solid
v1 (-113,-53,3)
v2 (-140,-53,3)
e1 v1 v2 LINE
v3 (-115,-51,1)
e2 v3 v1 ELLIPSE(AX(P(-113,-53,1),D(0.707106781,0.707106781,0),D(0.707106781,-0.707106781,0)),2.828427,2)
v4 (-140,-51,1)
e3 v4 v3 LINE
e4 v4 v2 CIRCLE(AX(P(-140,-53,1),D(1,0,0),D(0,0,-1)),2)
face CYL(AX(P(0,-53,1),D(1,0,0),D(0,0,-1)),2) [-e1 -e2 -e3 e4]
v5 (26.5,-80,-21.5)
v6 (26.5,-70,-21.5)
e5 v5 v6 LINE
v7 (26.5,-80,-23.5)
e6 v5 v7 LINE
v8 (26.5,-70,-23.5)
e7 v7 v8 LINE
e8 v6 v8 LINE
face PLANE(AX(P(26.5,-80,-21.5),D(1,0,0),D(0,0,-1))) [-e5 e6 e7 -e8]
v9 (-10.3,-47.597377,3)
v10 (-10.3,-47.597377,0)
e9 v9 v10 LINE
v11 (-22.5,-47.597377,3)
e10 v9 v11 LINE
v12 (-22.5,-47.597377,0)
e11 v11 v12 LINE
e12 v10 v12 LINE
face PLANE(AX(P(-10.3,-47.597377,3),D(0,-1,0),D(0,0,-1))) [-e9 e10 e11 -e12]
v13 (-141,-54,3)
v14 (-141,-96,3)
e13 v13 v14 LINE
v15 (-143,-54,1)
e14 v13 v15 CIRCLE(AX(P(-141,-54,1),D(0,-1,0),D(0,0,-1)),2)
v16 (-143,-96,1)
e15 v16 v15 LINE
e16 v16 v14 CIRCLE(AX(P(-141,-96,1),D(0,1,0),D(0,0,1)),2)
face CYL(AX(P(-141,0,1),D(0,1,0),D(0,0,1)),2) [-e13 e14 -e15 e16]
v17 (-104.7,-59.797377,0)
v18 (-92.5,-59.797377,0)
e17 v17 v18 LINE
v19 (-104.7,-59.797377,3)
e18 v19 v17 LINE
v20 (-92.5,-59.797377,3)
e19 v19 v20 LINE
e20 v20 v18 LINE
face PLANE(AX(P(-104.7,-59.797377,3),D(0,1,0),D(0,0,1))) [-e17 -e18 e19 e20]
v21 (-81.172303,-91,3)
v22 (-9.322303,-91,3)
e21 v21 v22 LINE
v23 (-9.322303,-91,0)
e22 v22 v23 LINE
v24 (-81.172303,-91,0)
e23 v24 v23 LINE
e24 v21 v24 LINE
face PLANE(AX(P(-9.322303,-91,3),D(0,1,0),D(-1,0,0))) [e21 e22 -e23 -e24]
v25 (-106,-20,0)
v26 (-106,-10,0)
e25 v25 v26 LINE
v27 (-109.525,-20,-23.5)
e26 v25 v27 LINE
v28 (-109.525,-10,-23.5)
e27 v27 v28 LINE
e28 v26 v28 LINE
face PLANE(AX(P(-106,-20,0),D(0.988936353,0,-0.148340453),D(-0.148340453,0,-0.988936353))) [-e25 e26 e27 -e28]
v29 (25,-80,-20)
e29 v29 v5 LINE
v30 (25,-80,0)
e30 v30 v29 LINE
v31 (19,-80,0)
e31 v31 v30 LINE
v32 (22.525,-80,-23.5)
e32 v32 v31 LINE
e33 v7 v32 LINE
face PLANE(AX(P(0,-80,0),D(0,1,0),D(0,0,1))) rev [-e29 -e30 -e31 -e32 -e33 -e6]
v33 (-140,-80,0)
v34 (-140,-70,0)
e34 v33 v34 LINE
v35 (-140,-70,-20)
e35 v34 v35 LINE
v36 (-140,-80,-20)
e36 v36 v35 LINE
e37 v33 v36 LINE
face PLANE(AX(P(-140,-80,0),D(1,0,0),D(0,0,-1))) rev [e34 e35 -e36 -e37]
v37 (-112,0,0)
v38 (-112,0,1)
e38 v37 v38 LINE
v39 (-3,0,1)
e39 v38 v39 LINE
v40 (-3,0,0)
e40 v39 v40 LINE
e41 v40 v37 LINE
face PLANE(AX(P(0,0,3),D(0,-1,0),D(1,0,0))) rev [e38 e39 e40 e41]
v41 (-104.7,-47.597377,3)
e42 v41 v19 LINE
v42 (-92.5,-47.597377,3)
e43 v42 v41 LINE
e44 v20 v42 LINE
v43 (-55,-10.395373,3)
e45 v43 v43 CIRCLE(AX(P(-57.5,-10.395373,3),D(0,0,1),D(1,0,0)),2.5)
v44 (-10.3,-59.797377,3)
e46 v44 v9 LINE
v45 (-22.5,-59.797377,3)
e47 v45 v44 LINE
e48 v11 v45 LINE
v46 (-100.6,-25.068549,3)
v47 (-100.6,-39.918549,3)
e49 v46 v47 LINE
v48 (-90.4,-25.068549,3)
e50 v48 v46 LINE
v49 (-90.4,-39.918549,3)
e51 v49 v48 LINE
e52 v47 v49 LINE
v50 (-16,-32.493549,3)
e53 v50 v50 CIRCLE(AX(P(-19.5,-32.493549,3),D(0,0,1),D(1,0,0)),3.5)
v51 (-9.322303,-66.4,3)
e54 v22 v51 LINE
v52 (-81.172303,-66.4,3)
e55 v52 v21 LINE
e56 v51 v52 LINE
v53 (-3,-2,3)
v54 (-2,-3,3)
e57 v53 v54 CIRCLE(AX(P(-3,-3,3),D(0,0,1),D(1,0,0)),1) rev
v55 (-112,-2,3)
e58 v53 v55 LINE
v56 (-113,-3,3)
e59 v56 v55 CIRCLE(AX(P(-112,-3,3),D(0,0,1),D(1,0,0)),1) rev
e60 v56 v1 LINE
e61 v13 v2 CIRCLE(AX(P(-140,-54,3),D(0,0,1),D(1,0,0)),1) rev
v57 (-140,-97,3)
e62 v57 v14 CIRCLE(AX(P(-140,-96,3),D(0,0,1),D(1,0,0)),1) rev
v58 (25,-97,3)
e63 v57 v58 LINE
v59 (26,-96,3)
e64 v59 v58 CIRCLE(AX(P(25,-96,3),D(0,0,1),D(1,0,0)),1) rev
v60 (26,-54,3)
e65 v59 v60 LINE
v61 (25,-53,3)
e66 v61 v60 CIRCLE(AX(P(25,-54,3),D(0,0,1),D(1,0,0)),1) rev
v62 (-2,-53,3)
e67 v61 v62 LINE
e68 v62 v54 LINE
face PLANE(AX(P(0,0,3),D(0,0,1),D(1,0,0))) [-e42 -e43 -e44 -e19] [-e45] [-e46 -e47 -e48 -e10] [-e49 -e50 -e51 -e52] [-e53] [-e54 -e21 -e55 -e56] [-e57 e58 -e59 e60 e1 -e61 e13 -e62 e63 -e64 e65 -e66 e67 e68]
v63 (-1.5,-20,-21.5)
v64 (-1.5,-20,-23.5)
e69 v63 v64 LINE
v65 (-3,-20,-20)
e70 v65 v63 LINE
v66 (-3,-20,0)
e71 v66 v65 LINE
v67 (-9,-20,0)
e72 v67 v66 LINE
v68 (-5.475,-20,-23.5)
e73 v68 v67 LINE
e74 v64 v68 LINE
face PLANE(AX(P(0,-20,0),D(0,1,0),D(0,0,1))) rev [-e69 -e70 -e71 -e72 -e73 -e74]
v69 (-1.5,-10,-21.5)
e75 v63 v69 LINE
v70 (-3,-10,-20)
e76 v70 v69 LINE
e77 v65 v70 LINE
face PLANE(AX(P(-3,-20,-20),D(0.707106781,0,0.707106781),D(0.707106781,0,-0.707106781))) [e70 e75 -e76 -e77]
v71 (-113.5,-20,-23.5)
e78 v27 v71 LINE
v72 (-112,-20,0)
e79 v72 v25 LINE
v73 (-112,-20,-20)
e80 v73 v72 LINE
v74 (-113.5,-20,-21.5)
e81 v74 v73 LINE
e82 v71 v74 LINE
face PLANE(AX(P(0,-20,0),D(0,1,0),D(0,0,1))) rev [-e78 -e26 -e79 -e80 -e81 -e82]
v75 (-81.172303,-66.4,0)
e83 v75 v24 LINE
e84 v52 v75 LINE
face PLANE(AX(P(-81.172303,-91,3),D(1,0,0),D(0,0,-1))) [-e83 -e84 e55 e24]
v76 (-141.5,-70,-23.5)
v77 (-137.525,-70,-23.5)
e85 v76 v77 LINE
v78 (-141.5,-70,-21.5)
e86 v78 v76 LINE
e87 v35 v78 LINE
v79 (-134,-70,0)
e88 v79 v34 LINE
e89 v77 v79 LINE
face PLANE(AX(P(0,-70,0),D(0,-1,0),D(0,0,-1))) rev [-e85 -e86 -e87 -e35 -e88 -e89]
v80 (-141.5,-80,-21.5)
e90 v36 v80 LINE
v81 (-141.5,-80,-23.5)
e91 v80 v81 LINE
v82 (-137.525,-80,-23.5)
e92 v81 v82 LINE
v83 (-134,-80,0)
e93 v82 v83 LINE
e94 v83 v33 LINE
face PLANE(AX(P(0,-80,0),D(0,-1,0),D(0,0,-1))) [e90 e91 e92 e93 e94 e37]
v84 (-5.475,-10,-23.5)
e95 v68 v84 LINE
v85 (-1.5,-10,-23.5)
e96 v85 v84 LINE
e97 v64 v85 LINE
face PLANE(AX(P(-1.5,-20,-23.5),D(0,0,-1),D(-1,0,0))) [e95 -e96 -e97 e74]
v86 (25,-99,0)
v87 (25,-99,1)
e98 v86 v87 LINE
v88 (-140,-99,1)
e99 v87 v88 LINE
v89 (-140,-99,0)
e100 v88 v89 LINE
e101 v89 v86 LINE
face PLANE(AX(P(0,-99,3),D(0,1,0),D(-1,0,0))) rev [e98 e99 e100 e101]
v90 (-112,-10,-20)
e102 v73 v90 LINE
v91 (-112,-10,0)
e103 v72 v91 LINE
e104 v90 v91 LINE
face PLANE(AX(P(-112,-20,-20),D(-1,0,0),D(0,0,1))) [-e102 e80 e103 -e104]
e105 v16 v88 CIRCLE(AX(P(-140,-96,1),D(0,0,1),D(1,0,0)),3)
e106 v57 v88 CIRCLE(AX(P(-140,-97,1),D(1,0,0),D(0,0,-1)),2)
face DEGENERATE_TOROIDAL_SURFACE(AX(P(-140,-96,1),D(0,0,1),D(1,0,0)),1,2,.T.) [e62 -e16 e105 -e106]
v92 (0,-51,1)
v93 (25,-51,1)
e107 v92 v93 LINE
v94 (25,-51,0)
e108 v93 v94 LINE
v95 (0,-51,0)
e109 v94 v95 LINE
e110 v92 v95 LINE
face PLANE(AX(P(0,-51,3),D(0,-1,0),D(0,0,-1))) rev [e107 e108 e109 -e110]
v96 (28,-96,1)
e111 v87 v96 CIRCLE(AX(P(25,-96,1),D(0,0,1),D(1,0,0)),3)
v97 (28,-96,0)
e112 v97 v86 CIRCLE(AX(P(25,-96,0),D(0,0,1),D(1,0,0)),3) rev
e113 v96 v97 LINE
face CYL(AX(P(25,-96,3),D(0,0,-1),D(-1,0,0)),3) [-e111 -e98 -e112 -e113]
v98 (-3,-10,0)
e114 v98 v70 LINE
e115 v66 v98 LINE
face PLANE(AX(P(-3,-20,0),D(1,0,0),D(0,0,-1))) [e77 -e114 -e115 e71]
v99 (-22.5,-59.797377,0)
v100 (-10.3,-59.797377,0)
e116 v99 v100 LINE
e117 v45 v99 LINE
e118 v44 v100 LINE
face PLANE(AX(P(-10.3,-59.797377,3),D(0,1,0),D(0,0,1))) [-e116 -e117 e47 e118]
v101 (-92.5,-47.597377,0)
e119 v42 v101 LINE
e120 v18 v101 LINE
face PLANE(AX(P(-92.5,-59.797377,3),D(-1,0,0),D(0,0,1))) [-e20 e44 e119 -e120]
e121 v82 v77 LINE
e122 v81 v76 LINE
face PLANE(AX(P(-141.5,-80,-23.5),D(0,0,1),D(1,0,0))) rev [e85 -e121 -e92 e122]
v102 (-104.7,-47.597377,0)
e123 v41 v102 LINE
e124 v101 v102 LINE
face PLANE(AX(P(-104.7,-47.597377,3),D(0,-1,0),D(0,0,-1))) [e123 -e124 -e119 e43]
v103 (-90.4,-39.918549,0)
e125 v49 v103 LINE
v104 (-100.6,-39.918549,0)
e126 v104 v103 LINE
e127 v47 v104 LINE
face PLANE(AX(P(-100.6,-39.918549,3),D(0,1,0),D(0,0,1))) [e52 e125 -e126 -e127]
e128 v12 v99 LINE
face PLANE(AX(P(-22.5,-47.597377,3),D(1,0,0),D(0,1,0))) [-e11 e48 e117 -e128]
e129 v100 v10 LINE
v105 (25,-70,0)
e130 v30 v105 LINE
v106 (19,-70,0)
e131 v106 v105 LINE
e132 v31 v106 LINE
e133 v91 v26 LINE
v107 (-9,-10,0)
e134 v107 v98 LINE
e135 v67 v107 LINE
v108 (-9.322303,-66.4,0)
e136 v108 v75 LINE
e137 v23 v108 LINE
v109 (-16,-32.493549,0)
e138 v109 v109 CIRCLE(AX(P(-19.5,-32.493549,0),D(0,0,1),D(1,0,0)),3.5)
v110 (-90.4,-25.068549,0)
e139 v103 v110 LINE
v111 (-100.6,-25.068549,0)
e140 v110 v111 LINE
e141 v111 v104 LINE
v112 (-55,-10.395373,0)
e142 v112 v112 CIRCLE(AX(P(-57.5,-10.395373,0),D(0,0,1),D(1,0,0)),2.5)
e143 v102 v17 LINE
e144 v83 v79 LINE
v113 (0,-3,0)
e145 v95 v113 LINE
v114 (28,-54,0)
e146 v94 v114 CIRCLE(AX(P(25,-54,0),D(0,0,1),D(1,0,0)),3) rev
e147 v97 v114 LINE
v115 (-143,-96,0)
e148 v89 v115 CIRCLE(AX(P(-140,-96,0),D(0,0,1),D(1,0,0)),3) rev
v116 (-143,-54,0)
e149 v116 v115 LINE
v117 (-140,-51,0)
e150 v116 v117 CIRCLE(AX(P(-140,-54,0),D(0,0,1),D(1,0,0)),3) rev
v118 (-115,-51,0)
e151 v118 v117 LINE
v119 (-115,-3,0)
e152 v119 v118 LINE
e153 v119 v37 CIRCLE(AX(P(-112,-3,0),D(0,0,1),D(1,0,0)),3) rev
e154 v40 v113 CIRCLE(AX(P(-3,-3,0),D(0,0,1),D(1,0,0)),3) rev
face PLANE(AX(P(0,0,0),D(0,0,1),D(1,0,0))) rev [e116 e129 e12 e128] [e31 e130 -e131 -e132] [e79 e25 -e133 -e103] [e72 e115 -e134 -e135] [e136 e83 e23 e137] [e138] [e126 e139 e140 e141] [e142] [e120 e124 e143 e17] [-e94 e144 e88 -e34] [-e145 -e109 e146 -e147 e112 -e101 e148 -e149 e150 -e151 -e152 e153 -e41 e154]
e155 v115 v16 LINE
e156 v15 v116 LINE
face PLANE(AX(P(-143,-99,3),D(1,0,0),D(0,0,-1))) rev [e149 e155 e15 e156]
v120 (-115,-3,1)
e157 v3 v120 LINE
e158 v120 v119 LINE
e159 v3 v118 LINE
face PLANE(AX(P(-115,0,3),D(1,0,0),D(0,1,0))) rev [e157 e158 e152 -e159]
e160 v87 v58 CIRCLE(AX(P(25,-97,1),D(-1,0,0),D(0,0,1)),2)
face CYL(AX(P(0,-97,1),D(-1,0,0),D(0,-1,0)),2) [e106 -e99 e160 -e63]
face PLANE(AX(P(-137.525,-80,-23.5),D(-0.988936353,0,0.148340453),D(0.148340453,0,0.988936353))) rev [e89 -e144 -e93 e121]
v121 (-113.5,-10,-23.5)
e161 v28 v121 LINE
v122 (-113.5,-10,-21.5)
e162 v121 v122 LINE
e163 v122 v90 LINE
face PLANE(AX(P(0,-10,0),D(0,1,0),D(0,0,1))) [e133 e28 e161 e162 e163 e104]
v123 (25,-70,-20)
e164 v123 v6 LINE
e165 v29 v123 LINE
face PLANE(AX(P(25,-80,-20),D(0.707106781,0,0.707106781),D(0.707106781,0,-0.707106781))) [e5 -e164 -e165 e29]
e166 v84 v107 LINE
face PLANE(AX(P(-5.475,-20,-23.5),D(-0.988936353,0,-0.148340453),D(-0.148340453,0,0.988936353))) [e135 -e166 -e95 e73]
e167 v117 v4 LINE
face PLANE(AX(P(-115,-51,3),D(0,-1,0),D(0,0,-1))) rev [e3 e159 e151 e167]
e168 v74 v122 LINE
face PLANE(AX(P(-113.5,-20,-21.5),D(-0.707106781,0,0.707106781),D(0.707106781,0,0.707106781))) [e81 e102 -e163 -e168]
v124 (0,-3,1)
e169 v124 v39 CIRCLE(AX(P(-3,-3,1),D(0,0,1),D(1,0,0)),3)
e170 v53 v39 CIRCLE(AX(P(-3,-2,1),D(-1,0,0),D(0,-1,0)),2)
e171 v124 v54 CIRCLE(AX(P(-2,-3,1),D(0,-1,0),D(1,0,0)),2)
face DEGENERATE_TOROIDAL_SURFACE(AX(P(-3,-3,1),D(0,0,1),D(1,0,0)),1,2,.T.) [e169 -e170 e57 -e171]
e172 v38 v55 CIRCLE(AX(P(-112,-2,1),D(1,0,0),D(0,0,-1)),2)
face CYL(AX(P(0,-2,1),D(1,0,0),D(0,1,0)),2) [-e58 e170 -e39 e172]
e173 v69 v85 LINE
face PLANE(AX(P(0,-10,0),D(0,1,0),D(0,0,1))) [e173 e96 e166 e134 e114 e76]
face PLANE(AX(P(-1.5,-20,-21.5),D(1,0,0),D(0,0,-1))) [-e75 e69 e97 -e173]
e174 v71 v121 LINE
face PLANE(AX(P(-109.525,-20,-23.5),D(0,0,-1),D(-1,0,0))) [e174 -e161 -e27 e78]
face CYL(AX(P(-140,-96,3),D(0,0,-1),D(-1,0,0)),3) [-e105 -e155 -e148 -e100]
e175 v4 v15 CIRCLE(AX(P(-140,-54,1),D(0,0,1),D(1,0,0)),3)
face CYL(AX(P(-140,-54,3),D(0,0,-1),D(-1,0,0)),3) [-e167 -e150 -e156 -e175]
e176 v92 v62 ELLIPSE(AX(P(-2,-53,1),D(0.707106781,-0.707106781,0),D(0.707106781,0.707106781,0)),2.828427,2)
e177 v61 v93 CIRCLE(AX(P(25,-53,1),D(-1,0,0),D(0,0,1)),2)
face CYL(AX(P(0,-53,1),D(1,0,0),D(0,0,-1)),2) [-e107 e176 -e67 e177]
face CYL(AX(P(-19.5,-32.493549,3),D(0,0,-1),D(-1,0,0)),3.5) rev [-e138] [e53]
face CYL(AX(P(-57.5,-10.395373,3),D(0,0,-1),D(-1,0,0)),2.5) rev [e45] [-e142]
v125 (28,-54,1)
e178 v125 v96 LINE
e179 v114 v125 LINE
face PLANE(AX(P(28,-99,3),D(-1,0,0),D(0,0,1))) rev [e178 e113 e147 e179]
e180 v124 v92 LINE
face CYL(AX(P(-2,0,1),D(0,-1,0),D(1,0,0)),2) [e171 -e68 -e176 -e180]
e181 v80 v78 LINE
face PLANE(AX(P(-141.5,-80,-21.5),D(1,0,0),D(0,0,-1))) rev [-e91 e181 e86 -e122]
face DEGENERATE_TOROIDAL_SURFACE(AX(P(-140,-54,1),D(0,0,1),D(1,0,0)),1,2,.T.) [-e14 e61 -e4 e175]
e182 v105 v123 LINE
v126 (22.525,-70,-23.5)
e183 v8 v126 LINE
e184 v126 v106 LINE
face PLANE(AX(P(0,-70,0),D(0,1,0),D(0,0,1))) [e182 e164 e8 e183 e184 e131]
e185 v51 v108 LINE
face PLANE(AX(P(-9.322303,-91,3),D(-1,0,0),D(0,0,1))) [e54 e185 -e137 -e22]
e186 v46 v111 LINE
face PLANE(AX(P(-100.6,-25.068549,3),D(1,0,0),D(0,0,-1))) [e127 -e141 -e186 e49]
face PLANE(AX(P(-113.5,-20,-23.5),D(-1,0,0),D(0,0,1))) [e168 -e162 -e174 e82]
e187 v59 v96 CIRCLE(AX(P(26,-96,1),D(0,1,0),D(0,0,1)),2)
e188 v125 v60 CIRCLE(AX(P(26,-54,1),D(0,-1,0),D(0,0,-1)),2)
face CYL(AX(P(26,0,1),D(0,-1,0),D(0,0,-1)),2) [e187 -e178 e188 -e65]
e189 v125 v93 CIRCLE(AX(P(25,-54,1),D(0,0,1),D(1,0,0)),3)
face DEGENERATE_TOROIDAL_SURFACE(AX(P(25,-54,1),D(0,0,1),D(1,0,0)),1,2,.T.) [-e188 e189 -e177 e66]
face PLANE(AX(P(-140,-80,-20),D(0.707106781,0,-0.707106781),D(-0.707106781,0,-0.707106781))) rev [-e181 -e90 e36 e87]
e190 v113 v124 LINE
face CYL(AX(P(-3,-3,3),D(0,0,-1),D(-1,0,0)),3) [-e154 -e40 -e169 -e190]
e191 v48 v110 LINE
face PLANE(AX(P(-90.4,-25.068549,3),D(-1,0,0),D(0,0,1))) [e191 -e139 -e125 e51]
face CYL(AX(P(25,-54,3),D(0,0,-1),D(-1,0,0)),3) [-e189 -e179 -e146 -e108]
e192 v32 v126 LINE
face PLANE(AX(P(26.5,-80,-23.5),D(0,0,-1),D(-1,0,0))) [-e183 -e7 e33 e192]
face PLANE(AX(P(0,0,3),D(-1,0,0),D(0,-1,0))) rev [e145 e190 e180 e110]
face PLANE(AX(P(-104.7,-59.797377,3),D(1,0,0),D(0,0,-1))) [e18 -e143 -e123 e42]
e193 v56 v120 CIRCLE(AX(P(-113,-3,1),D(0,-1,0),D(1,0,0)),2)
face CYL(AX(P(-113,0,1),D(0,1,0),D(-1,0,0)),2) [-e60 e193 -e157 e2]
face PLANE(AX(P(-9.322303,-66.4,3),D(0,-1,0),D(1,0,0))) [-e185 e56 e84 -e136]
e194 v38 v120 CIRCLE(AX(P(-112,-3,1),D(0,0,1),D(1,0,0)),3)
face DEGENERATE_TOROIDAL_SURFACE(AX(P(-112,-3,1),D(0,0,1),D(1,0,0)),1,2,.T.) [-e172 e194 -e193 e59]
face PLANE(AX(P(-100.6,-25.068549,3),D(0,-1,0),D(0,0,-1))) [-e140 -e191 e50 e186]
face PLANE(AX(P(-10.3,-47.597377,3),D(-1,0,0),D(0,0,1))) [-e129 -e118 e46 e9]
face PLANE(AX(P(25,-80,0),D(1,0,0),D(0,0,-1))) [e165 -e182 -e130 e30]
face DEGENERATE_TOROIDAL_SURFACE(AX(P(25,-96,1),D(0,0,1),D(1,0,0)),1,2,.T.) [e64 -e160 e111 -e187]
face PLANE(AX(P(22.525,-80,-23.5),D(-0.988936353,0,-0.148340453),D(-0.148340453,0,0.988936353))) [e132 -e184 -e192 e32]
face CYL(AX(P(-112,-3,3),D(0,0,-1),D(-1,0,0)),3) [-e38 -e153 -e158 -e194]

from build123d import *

# Parameters (mm, degrees)
SKETCH1_R           = 2.5
SKETCH1_R_2         = 3.5
SKETCH1_W           = 71.85
SKETCH1_H           = 24.6
SKETCH1_W_2         = 12.2
SKETCH1_H_2         = 12.2
SKETCH1_W_3         = 10.2
SKETCH1_H_3         = 14.85
BOSS_EXTRUDE1_DEPTH = 3
FILLET1_R           = 2
FILLET2_R           = 3
BOSS_EXTRUDE2_START = -10
BOSS_EXTRUDE2_DEPTH = 10
BOSS_EXTRUDE3_START = -10
BOSS_EXTRUDE3_DEPTH = 10


with BuildPart() as part:
    # Sketch1 → Boss-Extrude1 (new body)
    with BuildSketch(Plane.XY):
        Polygon((0, 0), (-115, 0), (-115, -51), (-143, -51), (-143, -99), (-115, -99), (0, -99), (28, -99), (28, -51), (0, -51), align=None)
        with Locations((-57.5, -10.395373235)):
            Circle(SKETCH1_R, mode=Mode.SUBTRACT)
        with Locations((-19.5, -32.493549158)):
            Circle(SKETCH1_R_2, mode=Mode.SUBTRACT)
        with Locations((-45.247302804, -78.7)):
            Rectangle(SKETCH1_W, SKETCH1_H, mode=Mode.SUBTRACT)
        with Locations((-98.6, -53.697377152)):
            Rectangle(SKETCH1_W_2, SKETCH1_H_2, mode=Mode.SUBTRACT)
        with Locations((-95.5, -32.493549158)):
            Rectangle(SKETCH1_W_3, SKETCH1_H_3, mode=Mode.SUBTRACT)
        with Locations((-16.4, -53.697377152)):
            Rectangle(SKETCH1_W_2, SKETCH1_H_2, mode=Mode.SUBTRACT)
    extrude(amount=BOSS_EXTRUDE1_DEPTH)

    # Fillet1
    fillet1_edges = [part.edges().sort_by_distance(p)[0] for p in [
        (-115, -25.5, 3),
        (-129, -51, 3),
        (-143, -75, 3),
        (-57.5, -99, 3),
        (28, -75, 3),
        (14, -51, 3),
        (0, -25.5, 3),
        (-57.5, 0, 3),
    ]]
    fillet(fillet1_edges, radius=FILLET1_R)

    # Fillet2
    # the kernel refuses this fillet: 3 mm, written as the material it takes off along each edge
    with BuildSketch(Plane(origin=(-140, -54, 3), x_dir=(0, 1, 0), z_dir=(1, 0, 0))) as fillet2_piece_1:
        with BuildLine():
            CenterArc((1, -2), 2, 0, 90)
            Line((3, -2), (3, 0))
            Line((3, 0), (1, 0))
        make_face()
    revolve(axis=Axis((-140, -54, 3), (0, 0, 1)), revolution_arc=90, mode=Mode.SUBTRACT)
    with BuildSketch(Plane(origin=(-140, -96, 3), x_dir=(-1, 0, 0), z_dir=(0, 1, 0))) as fillet2_piece_2:
        with BuildLine():
            CenterArc((1, -2), 2, 0, 90)
            Line((3, -2), (3, 0))
            Line((3, 0), (1, 0))
        make_face()
    revolve(axis=Axis((-140, -96, 3), (0, 0, 1)), revolution_arc=90, mode=Mode.SUBTRACT)
    with BuildSketch(Plane(origin=(-112, -3, 3), x_dir=(0, 1, 0), z_dir=(1, 0, 0))) as fillet2_piece_3:
        with BuildLine():
            CenterArc((1, -2), 2, 0, 90)
            Line((3, -2), (3, 0))
            Line((3, 0), (1, 0))
        make_face()
    revolve(axis=Axis((-112, -3, 3), (0, 0, 1)), revolution_arc=90, mode=Mode.SUBTRACT)
    with BuildSketch(Plane(origin=(25, -96, 3), x_dir=(0, -1, 0), z_dir=(-1, 0, 0))) as fillet2_piece_4:
        with BuildLine():
            CenterArc((1, -2), 2, 0, 90)
            Line((3, -2), (3, 0))
            Line((3, 0), (1, 0))
        make_face()
    revolve(axis=Axis((25, -96, 3), (0, 0, 1)), revolution_arc=90, mode=Mode.SUBTRACT)
    with BuildSketch(Plane(origin=(-3, -3, 3), x_dir=(1, 0, 0), z_dir=(0, -1, 0))) as fillet2_piece_5:
        with BuildLine():
            CenterArc((1, -2), 2, 0, 90)
            Line((3, -2), (3, 0))
            Line((3, 0), (1, 0))
        make_face()
    revolve(axis=Axis((-3, -3, 3), (0, 0, 1)), revolution_arc=90, mode=Mode.SUBTRACT)
    with BuildSketch(Plane(origin=(25, -54, 3), x_dir=(1, 0, 0), z_dir=(0, -1, 0))) as fillet2_piece_6:
        with BuildLine():
            CenterArc((1, -2), 2, 0, 90)
            Line((3, -2), (3, 0))
            Line((3, 0), (1, 0))
        make_face()
    revolve(axis=Axis((25, -54, 3), (0, 0, 1)), revolution_arc=90, mode=Mode.SUBTRACT)
    with BuildSketch(Plane(origin=(28, -51, -7.5), x_dir=(-1, 0, 0), z_dir=(0, 0, 1)), Plane(origin=(0, 0, -7.5), x_dir=(-1, 0, 0), z_dir=(0, 0, 1))) as fillet2_piece_7:
        with BuildLine():
            CenterArc((FILLET2_R, FILLET2_R), FILLET2_R, 180, 90)
            Line((0, FILLET2_R), (0, 0))
            Line((0, 0), (FILLET2_R, 0))
        make_face()
    extrude(amount=10.5, mode=Mode.SUBTRACT)
    with BuildSketch(Plane(origin=(-115, 0, -7.5), x_dir=(1, 0, 0), z_dir=(0, 0, 1)), Plane(origin=(-143, -51, -7.5), x_dir=(1, 0, 0), z_dir=(0, 0, 1)), Plane(origin=(28, -99, -7.5), x_dir=(-1, 0, 0), z_dir=(0, 0, 1)), Plane(origin=(-143, -99, -7.5), x_dir=(0, 1, 0), z_dir=(0, 0, 1))) as fillet2_piece_8:
        with BuildLine():
            CenterArc((FILLET2_R, -FILLET2_R), FILLET2_R, 90, 90)
            Line((0, -FILLET2_R), (0, 0))
            Line((0, 0), (FILLET2_R, 0))
        make_face()
    extrude(amount=10.5, mode=Mode.SUBTRACT)

    # Sketch3 → Boss-Extrude2 (add)
    with BuildSketch(Plane(origin=(0, -60, 0), x_dir=(1, 0, 0), z_dir=(0, 1, 0)).offset(BOSS_EXTRUDE2_START)):
        Polygon((25, 0), (25, 20), (26.5, 21.5), (26.5, 23.5), (22.525, 23.5), (19, 0), align=None)
        Polygon((-134, 0), (-140, 0), (-140, 20), (-141.5, 21.5), (-141.5, 23.5), (-137.525, 23.5), align=None)
    extrude(amount=-BOSS_EXTRUDE2_DEPTH)

    # Sketch4 → Boss-Extrude3 (add)
    with BuildSketch(Plane(origin=(0, 0, 0), x_dir=(1, 0, 0), z_dir=(0, 1, 0)).offset(BOSS_EXTRUDE3_START)):
        Polygon((-112, 0), (-106, 0), (-109.525, 23.5), (-113.5, 23.5), (-113.5, 21.5), (-112, 20), align=None)
        Polygon((-1.5, 21.5), (-1.5, 23.5), (-5.475, 23.5), (-9, 0), (-3, 0), (-3, 20), align=None)
    extrude(amount=-BOSS_EXTRUDE3_DEPTH)


solid = part.part
